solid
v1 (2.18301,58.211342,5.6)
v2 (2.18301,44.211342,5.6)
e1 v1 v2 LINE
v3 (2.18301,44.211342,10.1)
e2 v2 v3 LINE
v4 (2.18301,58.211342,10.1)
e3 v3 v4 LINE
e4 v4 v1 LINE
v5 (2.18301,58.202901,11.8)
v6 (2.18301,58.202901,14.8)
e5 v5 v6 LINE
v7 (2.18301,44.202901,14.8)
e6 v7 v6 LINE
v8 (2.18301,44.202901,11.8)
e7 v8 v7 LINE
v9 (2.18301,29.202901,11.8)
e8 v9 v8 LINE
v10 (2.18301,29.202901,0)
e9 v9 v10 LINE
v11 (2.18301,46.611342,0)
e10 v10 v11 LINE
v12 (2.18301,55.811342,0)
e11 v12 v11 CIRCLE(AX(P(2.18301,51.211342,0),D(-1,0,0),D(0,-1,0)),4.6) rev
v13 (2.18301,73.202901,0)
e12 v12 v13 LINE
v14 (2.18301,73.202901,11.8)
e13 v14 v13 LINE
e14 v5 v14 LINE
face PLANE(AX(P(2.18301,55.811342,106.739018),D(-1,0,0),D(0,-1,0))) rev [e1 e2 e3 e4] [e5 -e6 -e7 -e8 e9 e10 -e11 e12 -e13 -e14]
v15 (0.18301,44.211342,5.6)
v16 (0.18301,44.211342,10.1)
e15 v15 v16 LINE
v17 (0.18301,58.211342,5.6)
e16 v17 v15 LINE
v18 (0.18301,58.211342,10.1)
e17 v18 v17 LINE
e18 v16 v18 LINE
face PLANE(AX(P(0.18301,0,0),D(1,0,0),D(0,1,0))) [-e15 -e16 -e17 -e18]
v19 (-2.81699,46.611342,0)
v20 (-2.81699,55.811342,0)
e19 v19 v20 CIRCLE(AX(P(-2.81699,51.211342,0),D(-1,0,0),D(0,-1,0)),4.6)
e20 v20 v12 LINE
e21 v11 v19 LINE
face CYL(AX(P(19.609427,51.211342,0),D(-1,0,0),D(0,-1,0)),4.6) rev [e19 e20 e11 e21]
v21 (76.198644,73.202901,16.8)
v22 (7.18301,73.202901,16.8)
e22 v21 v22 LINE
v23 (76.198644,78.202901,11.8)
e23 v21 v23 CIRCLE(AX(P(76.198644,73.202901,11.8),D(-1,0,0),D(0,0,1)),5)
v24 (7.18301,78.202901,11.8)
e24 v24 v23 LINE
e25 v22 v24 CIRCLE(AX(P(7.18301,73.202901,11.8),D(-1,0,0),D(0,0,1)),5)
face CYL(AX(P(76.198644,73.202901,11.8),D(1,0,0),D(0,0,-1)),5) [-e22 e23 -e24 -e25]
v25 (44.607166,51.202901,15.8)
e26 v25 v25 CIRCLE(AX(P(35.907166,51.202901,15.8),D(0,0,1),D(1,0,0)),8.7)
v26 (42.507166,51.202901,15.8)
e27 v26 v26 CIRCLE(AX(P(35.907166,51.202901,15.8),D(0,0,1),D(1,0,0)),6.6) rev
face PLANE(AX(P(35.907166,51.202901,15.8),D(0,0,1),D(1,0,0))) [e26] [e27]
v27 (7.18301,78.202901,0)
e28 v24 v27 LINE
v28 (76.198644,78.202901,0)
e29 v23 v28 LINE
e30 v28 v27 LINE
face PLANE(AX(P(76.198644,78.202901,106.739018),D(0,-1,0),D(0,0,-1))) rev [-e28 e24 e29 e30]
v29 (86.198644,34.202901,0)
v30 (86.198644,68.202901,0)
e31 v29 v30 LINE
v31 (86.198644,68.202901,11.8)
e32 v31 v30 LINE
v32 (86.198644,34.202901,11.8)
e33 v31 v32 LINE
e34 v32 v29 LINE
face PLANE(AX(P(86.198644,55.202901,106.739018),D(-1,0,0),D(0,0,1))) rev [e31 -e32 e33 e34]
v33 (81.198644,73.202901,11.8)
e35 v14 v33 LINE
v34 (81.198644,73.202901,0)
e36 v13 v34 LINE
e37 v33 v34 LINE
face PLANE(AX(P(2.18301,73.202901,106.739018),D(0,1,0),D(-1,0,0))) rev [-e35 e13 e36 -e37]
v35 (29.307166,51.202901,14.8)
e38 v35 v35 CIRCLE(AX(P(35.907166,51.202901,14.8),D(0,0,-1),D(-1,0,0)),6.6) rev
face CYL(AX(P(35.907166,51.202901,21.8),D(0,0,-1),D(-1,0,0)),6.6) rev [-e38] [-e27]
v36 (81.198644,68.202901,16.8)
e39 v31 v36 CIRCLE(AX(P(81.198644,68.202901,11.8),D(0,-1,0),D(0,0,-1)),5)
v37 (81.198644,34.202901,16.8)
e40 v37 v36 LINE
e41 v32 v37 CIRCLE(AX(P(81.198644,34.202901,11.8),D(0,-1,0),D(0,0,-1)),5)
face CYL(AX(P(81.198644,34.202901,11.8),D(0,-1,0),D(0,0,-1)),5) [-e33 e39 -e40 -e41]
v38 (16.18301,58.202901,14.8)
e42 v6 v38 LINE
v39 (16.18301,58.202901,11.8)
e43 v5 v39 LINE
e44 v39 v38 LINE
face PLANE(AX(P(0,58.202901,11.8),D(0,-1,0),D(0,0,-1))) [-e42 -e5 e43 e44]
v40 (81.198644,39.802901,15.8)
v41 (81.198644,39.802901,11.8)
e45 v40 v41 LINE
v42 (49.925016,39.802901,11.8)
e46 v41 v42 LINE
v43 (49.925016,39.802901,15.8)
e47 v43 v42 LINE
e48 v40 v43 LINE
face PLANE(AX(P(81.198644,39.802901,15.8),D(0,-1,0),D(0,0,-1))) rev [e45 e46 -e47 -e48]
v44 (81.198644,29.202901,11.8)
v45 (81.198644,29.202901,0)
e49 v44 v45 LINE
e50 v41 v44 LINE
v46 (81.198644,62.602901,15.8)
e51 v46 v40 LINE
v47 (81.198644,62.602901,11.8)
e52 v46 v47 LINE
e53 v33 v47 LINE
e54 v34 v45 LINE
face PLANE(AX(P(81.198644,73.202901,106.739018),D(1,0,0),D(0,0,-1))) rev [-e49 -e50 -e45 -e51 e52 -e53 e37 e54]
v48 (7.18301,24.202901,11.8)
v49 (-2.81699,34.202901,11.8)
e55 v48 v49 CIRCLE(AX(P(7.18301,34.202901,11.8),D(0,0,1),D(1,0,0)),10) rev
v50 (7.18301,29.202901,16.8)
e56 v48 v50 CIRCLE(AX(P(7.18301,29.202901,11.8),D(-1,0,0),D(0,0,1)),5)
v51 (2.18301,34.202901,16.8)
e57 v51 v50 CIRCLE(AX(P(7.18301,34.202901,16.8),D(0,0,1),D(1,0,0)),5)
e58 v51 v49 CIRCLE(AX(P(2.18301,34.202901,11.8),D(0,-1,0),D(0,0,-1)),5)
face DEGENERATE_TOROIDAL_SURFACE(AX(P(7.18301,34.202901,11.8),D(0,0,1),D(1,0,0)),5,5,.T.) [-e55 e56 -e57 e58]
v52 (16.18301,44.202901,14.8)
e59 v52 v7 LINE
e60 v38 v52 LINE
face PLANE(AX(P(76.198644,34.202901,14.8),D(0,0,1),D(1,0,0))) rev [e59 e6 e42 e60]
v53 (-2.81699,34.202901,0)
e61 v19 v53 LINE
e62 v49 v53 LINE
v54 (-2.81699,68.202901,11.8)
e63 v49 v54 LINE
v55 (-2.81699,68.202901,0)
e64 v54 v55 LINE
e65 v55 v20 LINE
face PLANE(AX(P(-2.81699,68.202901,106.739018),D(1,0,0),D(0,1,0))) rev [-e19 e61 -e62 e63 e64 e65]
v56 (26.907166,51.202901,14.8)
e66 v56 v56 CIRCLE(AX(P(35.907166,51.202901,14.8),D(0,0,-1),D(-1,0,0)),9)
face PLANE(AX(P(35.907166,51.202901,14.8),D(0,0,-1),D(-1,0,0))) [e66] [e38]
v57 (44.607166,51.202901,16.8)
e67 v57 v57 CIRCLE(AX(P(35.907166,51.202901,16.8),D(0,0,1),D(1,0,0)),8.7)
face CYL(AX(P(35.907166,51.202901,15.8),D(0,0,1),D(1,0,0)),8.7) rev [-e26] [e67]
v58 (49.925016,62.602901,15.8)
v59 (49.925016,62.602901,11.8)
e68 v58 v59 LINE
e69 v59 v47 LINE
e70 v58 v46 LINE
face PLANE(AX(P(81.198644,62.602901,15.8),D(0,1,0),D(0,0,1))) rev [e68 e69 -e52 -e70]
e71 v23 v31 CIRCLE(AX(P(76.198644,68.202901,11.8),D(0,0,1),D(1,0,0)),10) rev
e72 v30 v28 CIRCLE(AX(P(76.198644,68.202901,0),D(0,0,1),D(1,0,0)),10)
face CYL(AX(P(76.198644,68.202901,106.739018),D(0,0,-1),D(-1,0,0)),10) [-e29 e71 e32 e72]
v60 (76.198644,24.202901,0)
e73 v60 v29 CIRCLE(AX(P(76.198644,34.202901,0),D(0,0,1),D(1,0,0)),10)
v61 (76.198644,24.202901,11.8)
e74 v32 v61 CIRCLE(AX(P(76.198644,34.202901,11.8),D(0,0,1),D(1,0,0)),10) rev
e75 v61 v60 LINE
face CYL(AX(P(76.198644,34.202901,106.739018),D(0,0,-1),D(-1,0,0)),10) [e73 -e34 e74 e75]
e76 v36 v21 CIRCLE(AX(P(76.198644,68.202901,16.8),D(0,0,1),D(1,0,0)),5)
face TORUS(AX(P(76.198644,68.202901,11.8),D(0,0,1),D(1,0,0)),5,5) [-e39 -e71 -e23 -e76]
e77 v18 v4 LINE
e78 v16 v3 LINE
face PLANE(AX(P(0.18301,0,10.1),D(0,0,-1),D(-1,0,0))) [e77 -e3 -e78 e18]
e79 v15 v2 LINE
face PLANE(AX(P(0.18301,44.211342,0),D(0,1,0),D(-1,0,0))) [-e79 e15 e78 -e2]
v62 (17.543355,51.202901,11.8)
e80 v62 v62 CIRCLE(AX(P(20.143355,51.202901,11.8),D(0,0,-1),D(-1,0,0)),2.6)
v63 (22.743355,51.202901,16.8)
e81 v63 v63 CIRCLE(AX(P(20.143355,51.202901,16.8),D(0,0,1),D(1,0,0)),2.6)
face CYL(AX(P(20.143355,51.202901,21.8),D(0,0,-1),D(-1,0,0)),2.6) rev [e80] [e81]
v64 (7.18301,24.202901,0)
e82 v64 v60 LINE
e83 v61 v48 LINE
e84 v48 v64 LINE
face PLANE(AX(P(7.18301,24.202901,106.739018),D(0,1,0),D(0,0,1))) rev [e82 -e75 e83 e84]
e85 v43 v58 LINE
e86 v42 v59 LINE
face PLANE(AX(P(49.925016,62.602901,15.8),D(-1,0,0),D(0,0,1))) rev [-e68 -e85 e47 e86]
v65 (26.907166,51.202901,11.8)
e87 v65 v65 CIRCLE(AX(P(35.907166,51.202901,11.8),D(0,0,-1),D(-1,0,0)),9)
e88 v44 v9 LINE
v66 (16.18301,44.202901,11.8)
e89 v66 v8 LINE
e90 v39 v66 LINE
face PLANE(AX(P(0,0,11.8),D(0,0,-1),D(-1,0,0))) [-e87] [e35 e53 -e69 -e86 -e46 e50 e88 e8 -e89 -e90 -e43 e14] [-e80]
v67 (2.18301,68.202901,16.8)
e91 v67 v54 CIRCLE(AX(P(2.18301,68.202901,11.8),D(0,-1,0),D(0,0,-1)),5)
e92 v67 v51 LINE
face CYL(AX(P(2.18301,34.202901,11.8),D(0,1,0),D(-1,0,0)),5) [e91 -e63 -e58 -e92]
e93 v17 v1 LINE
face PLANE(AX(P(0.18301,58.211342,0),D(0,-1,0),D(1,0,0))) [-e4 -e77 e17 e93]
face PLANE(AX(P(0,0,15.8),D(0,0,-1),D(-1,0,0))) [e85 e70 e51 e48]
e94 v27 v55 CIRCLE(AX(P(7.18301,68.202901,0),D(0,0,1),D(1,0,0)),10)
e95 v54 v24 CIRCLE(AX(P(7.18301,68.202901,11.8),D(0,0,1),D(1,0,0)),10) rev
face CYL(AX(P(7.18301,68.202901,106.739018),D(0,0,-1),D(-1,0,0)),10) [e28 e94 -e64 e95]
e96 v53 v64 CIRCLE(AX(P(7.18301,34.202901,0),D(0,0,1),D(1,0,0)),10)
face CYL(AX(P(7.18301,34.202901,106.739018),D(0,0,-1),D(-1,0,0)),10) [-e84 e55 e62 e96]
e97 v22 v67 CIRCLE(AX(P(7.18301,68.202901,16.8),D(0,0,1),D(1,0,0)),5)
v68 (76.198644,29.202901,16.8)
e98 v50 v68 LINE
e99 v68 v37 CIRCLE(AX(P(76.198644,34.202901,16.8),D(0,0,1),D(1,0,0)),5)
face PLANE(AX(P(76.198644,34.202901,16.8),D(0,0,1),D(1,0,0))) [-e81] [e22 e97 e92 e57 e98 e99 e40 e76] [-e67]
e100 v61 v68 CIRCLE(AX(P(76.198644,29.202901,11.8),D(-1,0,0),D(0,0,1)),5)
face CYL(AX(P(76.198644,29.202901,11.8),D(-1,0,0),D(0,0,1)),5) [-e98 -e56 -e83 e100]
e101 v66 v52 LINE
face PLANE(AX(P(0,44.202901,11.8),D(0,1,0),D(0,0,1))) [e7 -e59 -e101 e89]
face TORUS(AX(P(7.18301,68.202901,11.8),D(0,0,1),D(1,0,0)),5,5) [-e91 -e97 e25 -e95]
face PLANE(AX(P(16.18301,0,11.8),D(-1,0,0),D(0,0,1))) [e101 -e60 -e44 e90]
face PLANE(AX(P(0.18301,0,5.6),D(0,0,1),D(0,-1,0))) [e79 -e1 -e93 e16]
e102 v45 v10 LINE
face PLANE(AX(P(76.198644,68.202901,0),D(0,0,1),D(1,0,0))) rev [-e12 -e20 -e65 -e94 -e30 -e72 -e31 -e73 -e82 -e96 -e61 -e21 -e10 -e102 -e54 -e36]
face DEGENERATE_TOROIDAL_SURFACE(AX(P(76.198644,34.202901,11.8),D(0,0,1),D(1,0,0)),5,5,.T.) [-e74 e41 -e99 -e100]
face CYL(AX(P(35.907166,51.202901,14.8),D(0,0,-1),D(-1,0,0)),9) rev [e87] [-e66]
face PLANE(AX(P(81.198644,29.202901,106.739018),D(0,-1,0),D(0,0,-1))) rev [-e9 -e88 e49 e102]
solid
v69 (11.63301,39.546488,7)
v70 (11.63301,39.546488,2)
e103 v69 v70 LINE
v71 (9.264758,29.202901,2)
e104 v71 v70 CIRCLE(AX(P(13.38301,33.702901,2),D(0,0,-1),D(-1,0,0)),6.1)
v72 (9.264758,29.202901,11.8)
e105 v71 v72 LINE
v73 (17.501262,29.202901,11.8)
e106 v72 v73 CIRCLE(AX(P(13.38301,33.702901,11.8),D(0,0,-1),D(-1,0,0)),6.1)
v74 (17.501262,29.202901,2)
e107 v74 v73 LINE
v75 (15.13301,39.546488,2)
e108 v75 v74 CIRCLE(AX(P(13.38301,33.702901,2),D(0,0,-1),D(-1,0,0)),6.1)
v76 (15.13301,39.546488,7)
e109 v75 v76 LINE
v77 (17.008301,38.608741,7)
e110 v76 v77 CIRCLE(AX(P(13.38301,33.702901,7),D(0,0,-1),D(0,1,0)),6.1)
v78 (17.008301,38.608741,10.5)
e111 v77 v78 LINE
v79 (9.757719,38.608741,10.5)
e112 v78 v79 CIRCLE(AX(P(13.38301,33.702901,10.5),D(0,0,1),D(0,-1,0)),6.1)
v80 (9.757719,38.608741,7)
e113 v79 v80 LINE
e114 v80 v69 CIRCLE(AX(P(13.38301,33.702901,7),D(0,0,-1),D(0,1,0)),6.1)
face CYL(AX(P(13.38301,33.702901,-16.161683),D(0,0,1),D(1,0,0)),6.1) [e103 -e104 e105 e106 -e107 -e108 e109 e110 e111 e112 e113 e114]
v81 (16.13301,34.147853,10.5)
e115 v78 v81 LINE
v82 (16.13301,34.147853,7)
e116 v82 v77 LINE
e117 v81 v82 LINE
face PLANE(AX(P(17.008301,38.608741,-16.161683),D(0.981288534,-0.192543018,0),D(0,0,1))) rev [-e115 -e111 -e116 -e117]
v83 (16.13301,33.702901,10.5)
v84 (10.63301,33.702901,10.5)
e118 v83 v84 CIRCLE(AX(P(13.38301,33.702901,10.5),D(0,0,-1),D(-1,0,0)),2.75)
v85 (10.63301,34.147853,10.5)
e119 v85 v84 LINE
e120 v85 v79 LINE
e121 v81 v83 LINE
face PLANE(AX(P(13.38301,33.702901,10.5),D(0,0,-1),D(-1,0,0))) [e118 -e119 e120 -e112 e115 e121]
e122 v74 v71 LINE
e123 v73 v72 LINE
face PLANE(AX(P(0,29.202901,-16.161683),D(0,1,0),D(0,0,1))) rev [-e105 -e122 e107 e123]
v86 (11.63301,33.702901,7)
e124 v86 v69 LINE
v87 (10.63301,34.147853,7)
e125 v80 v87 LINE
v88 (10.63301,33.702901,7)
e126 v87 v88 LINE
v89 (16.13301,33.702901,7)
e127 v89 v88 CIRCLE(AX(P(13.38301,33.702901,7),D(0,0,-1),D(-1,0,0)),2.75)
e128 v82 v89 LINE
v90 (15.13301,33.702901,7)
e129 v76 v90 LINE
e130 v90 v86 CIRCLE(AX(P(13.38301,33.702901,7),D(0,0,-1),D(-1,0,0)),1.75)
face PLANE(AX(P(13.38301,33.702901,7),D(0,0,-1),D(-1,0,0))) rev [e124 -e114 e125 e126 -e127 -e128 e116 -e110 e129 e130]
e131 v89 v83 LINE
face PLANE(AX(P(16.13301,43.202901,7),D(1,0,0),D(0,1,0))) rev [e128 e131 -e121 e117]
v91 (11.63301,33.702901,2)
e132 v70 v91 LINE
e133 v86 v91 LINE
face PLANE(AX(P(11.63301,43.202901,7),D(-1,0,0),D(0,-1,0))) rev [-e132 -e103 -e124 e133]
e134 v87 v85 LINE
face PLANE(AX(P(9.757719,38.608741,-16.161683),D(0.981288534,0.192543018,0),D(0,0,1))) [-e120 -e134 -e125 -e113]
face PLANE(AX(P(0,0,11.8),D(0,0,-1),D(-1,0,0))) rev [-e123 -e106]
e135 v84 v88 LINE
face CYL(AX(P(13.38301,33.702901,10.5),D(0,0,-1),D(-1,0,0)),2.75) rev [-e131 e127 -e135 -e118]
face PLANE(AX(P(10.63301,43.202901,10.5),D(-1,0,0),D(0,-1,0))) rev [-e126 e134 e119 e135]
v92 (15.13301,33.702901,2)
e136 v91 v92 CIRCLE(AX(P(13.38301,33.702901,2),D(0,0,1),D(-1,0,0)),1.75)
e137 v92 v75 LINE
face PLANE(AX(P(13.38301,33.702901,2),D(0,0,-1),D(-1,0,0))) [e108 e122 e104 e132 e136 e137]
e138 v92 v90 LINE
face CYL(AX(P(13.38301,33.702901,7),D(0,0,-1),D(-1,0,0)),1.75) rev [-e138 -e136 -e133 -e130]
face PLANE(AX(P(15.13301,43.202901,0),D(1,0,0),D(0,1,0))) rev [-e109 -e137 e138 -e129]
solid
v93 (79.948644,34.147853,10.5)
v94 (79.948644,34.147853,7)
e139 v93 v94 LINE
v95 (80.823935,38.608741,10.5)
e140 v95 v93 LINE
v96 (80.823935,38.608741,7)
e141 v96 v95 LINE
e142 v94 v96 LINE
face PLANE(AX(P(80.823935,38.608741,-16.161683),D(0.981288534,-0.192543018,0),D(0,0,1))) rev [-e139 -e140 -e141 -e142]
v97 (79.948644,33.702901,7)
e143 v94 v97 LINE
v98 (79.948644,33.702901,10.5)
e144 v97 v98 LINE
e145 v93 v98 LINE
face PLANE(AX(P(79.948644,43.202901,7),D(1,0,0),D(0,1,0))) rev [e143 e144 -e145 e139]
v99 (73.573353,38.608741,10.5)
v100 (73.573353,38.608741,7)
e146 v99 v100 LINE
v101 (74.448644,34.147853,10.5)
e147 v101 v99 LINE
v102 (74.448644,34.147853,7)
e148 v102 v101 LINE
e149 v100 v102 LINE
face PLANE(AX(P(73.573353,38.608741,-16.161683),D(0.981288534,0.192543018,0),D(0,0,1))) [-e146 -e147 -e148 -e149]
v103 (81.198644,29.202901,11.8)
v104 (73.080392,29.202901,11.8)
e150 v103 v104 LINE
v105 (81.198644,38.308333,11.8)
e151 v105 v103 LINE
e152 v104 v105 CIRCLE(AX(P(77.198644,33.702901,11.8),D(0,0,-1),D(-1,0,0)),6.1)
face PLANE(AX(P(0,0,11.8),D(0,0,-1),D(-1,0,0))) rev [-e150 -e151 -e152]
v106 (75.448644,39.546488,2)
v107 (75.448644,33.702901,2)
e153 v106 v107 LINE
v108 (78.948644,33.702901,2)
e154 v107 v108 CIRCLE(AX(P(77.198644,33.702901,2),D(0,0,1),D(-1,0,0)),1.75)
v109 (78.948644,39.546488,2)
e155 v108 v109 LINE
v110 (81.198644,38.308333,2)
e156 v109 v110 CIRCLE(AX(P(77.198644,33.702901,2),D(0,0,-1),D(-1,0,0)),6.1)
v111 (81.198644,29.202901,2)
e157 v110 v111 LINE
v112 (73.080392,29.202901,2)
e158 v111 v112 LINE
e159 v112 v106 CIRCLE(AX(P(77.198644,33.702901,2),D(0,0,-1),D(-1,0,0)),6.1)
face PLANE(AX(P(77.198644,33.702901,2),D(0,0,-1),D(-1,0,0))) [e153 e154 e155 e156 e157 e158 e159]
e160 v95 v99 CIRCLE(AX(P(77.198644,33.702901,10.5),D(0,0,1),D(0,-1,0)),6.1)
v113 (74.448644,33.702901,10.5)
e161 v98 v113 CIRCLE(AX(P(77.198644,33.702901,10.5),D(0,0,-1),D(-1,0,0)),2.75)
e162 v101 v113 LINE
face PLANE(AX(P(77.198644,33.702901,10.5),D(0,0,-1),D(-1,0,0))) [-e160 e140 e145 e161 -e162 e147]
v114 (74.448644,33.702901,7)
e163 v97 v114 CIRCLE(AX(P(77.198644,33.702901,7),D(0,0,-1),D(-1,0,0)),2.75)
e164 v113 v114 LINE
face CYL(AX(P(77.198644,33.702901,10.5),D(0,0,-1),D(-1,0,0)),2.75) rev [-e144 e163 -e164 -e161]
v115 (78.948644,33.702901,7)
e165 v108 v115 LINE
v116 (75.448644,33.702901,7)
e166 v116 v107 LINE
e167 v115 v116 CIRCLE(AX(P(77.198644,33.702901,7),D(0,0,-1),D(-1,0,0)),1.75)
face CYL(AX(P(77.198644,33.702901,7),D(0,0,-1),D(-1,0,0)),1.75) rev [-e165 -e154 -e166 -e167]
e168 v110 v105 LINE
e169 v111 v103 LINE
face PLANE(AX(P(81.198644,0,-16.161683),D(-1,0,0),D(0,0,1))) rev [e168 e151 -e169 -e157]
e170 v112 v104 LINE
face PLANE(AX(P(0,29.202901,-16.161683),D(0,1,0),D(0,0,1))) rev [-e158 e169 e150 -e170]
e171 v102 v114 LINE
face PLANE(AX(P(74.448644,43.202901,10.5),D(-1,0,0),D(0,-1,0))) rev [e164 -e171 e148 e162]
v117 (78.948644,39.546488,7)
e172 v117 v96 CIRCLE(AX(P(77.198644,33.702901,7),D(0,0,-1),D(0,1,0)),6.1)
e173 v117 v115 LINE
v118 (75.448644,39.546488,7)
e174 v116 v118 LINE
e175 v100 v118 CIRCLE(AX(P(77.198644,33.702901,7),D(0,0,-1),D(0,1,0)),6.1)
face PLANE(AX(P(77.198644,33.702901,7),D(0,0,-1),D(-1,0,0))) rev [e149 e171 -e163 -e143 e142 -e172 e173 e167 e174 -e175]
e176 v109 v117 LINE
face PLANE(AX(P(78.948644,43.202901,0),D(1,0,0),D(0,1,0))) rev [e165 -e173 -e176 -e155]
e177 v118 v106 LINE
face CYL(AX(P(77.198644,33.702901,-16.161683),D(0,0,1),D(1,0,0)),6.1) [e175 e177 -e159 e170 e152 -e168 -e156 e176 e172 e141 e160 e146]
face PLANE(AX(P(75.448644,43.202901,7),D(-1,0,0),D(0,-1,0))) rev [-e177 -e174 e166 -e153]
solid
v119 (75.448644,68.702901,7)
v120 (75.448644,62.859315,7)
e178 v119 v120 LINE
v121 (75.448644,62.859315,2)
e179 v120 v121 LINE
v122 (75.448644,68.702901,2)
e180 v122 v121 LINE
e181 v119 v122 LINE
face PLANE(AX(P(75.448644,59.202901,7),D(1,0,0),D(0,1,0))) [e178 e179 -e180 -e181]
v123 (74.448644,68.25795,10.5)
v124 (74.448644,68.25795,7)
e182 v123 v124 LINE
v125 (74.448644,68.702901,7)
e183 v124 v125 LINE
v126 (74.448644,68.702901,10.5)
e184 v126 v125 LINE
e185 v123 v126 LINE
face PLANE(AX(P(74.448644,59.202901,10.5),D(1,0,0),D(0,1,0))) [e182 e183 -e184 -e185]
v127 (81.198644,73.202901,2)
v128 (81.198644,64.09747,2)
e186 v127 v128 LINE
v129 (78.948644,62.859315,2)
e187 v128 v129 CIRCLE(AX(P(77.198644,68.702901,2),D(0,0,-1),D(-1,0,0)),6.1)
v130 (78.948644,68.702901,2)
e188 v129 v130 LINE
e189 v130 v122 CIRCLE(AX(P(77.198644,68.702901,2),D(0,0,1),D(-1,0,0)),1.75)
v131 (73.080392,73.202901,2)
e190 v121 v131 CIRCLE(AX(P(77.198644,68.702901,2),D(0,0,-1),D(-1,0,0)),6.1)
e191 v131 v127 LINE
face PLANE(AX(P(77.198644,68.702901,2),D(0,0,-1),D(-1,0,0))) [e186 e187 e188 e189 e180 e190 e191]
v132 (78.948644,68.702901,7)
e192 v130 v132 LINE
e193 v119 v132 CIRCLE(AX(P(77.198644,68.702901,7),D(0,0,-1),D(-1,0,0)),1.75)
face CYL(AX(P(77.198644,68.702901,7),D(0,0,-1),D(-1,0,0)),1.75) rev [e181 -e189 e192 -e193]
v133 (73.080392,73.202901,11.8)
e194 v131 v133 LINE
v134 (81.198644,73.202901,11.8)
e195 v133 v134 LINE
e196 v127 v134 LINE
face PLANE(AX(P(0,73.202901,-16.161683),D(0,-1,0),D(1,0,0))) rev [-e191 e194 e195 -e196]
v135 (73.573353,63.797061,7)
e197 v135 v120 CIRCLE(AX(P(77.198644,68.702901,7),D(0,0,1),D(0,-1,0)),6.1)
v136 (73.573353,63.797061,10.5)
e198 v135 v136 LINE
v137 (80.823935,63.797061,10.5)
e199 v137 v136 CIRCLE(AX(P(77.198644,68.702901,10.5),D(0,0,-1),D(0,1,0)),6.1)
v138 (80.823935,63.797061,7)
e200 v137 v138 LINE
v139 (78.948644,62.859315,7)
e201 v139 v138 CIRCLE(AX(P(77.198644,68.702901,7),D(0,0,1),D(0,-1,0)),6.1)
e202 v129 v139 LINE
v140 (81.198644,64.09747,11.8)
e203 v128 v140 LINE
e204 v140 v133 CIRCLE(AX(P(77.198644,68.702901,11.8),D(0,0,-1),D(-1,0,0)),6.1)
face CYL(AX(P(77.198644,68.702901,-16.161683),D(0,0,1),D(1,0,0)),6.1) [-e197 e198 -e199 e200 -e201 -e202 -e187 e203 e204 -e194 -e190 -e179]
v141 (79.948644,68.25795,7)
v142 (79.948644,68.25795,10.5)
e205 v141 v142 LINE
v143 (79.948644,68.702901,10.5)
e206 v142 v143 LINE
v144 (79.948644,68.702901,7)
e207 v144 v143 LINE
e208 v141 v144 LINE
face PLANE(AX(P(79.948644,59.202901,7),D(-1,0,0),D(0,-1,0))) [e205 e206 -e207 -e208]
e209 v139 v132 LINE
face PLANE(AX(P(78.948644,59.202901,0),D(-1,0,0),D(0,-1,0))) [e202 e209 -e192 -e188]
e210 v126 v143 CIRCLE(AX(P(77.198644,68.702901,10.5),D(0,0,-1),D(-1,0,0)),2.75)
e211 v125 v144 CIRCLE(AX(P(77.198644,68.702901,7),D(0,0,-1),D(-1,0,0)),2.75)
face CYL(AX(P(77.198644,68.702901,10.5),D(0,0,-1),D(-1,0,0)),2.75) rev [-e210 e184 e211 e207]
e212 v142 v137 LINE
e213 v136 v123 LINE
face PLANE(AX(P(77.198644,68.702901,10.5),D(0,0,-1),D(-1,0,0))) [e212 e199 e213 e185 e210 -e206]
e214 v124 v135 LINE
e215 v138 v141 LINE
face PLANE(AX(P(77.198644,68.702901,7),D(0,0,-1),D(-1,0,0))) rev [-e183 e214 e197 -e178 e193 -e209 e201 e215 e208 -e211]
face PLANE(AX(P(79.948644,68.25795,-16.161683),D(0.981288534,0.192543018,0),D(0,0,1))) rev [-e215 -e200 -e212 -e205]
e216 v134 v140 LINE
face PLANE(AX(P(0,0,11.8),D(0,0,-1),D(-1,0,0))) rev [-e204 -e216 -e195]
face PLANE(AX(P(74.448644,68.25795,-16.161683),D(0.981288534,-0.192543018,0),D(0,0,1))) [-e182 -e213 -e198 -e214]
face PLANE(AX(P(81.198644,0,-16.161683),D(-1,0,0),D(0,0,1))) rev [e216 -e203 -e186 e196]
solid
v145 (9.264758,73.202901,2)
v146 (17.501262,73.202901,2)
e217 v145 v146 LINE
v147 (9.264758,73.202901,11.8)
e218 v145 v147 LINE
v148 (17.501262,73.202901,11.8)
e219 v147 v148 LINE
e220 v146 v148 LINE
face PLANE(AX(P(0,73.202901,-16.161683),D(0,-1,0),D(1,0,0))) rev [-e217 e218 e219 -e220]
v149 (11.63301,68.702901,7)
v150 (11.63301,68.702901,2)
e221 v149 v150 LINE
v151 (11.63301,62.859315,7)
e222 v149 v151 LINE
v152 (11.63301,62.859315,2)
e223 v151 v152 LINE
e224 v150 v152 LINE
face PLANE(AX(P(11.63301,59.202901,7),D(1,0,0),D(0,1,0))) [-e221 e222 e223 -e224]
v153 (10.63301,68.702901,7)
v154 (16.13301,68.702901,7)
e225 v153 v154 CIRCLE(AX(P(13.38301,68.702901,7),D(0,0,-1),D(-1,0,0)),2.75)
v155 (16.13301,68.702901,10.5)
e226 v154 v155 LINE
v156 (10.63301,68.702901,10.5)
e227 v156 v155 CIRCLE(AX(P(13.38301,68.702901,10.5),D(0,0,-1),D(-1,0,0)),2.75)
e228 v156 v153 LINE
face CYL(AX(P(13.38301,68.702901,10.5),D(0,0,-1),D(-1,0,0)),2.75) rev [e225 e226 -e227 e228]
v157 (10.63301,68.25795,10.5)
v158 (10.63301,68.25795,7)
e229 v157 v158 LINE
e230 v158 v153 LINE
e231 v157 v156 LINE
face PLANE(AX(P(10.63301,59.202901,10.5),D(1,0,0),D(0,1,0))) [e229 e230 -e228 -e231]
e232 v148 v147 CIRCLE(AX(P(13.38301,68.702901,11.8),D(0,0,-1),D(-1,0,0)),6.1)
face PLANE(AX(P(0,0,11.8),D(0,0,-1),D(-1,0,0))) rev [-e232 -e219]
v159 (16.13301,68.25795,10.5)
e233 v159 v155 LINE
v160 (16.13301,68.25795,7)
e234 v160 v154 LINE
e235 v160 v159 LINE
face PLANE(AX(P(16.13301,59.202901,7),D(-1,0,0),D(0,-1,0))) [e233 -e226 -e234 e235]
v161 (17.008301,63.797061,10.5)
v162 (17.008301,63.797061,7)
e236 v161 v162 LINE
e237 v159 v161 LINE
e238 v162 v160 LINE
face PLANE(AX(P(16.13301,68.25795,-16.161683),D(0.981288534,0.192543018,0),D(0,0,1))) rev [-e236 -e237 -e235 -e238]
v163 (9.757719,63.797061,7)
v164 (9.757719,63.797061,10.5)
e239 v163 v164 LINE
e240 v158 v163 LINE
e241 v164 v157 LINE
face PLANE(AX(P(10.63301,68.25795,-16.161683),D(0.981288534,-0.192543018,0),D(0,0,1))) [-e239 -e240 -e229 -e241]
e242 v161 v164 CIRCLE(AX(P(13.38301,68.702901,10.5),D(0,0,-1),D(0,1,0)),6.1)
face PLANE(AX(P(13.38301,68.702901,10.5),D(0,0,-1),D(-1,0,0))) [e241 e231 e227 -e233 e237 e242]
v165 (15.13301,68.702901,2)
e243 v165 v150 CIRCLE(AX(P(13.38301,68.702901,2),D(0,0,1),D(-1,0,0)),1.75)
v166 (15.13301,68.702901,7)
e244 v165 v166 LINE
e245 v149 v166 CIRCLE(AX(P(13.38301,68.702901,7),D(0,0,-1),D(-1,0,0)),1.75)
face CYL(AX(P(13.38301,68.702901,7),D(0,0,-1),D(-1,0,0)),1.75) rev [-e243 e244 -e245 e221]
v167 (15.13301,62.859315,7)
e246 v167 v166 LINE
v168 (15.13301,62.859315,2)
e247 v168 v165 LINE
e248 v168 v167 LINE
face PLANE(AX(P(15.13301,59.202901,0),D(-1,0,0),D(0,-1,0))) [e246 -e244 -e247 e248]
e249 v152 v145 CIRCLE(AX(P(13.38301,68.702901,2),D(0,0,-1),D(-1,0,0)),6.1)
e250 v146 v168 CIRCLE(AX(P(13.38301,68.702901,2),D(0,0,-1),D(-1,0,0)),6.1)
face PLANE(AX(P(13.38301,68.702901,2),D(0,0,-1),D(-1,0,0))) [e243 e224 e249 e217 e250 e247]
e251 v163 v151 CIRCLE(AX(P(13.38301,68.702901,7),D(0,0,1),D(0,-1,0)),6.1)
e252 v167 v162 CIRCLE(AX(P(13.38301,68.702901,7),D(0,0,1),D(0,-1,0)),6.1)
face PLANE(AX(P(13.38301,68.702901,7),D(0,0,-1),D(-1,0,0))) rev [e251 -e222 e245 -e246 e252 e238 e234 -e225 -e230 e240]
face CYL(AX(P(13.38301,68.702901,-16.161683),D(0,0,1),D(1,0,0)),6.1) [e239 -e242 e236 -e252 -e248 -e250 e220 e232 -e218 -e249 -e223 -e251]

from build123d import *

# Parameters (mm, degrees)
BOSS_EXTRUDE1_DEPTH   = 14.8
BOSS_EXTRUDE1_2_DEPTH = 14.8
BOSS_EXTRUDE2_DEPTH   = 5
SKETCH3_W             = 5
SKETCH3_H             = 14.8
BOSS_EXTRUDE3_DEPTH   = 12
BOSS_EXTRUDE4_DEPTH   = 2
BOSS_EXTRUDE5_DEPTH   = 3
CUT_EXTRUDE1_DEPTH    = 10
FILLET1_R             = 5
SKETCH8_R             = 1.75
BOSS_EXTRUDE6_DEPTH   = 11.8
SKETCH9_R             = 1.75
CUT_EXTRUDE2_DEPTH    = 7
SKETCH10_R            = 2.75
CUT_EXTRUDE3_DEPTH    = 3.5
CUT_EXTRUDE4_DEPTH    = 9.5
CUT_EXTRUDE5_DEPTH    = 9.5
CUT_EXTRUDE6_DEPTH    = 2
SKETCH14_R            = 9
CUT_EXTRUDE7_DEPTH    = 3
CUT_EXTRUDE8_DEPTH    = 2
CHAMFER1_SIZE         = 5
CHAMFER2_SIZE         = 5
CHAMFER3_SIZE         = 5
CHAMFER4_SIZE         = 5
SKETCH16_W            = 31.273628052
SKETCH16_H            = 22.8
CUT_EXTRUDE9_DEPTH    = 4
SKETCH17_R            = 8.7
CUT_EXTRUDE10_DEPTH   = 1


with BuildPart() as part:
    # Sketch1 → Boss-Extrude1 (new body)
    with BuildSketch(Plane.XY):
        with BuildLine():
            Line((76.198643796, 78.202901291), (7.183009885, 78.202901291))
            ThreePointArc((7.183009885, 78.202901291), (0.111942073, 75.273969103), (-2.816990115, 68.202901291))
            Line((-2.816990115, 68.202901291), (-2.816990115, 55.811342077))
            Line((-2.816990115, 55.811342077), (2.183009885, 55.811342077))
            Line((2.183009885, 55.811342077), (2.183009885, 73.202901291))
            Line((2.183009885, 73.202901291), (81.198643796, 73.202901291))
            Line((81.198643796, 73.202901291), (81.198643796, 55.202901291))
            Line((81.198643796, 55.202901291), (86.198643796, 55.202901291))
            Line((86.198643796, 55.202901291), (86.198643796, 68.202901291))
            ThreePointArc((86.198643796, 68.202901291), (83.269711608, 75.273969103), (76.198643796, 78.202901291))
        make_face()
    extrude(amount=BOSS_EXTRUDE1_DEPTH)



with BuildPart() as body_2:
    # Sketch1 → Boss-Extrude1 2 (new body)
    with BuildSketch(Plane.XY):
        with BuildLine():
            Line((7.183009885, 24.202901291), (76.198643796, 24.202901291))
            ThreePointArc((76.198643796, 24.202901291), (83.269711608, 27.131833479), (86.198643796, 34.202901291))
            Line((86.198643796, 34.202901291), (86.198643796, 47.202901291))
            Line((86.198643796, 47.202901291), (81.198643796, 47.202901291))
            Line((81.198643796, 47.202901291), (81.198643796, 29.202901291))
            Line((81.198643796, 29.202901291), (2.183009885, 29.202901291))
            Line((2.183009885, 29.202901291), (2.183009885, 46.611342077))
            Line((2.183009885, 46.611342077), (-2.816990115, 46.611342077))
            Line((-2.816990115, 46.611342077), (-2.816990115, 34.202901291))
            ThreePointArc((-2.816990115, 34.202901291), (0.111942073, 27.131833479), (7.183009885, 24.202901291))
        make_face()
    extrude(amount=BOSS_EXTRUDE1_2_DEPTH)


with BuildPart() as part_1:
    add(part.part)

    add(body_2.part)  # Boss-Extrude2 merges body 2
    # Sketch2 → Boss-Extrude2 (add)
    with BuildSketch(Plane.ZY.offset(2.816990115)):
        with BuildLine():
            ThreePointArc((0, 46.611342077), (4.6, 51.211342077), (0, 55.811342077))
            Line((0, 55.811342077), (14.8, 55.811342077))
            Line((14.8, 55.811342077), (14.8, 46.611342077))
            Line((14.8, 46.611342077), (0, 46.611342077))
        make_face()
    extrude(amount=-BOSS_EXTRUDE2_DEPTH)

    # Sketch3 → Boss-Extrude3 (add)
    with BuildSketch(Plane(origin=(0, 47.202901291, 0), x_dir=(1, 0, 0), z_dir=(0, 1, 0))):
        with Locations((83.698643796, -7.4)):
            Rectangle(SKETCH3_W, SKETCH3_H)
    extrude(amount=BOSS_EXTRUDE3_DEPTH)

    # Sketch4 → Boss-Extrude4 (add)
    with BuildSketch(Plane.XY.offset(14.8)):
        with BuildLine():
            Line((86.198643796, 34.202901291), (86.198643796, 68.202901291))
            ThreePointArc((86.198643796, 68.202901291), (83.269711608, 75.273969103), (76.198643796, 78.202901291))
            Line((76.198643796, 78.202901291), (7.183009885, 78.202901291))
            ThreePointArc((7.183009885, 78.202901291), (0.111942073, 75.273969103), (-2.816990115, 68.202901291))
            Line((-2.816990115, 68.202901291), (-2.816990115, 34.202901291))
            ThreePointArc((-2.816990115, 34.202901291), (0.111942073, 27.131833479), (7.183009885, 24.202901291))
            Line((7.183009885, 24.202901291), (76.198643796, 24.202901291))
            ThreePointArc((76.198643796, 24.202901291), (83.269711608, 27.131833479), (86.198643796, 34.202901291))
        make_face()
    extrude(amount=BOSS_EXTRUDE4_DEPTH)

    # Sketch6 → Boss-Extrude5 (add)
    with BuildSketch(Plane(origin=(0, 0, 14.8), x_dir=(-1, 0, 0), z_dir=(0, 0, -1))):
        Polygon((-16.183009885, 58.202901291), (-2.183009885, 58.202901291), (-2.183009885, 73.202901291), (-81.198643796, 73.202901291), (-81.198643796, 59.527901291), (-80.198643796, 59.527901291), (-79.792394453, 59.527901291), (-54.598643796, 59.527901291), (-54.598643796, 42.877901291), (-80.198643796, 42.877901291), (-81.198643796, 42.877901291), (-81.198643796, 29.202901291), (-2.183009885, 29.202901291), (-2.183009885, 44.202901291), (-16.183009885, 44.202901291), align=None)
    extrude(amount=BOSS_EXTRUDE5_DEPTH)

    # Sketch7 → Cut-Extrude1 (cut)
    with BuildSketch(Plane(origin=(0, 0, 11.8), x_dir=(-1, 0, 0), z_dir=(0, 0, -1))):
        with BuildLine():
            ThreePointArc((-42.507165967, 51.202901291), (-35.907165967, 44.602901291), (-29.307165967, 51.202901291))
            Line((-29.307165967, 51.202901291), (-42.507165967, 51.202901291))
        make_face()
        with BuildLine():
            Line((-42.507165967, 51.202901291), (-29.307165967, 51.202901291))
            ThreePointArc((-29.307165967, 51.202901291), (-35.907165967, 57.802901291), (-42.507165967, 51.202901291))
        make_face()
        with BuildLine():
            ThreePointArc((-22.743355222, 51.202901291), (-20.143355222, 48.602901291), (-17.543355222, 51.202901291))
            Line((-17.543355222, 51.202901291), (-22.743355222, 51.202901291))
        make_face()
        with BuildLine():
            Line((-22.743355222, 51.202901291), (-17.543355222, 51.202901291))
            ThreePointArc((-17.543355222, 51.202901291), (-20.143355222, 53.802901291), (-22.743355222, 51.202901291))
        make_face()
    extrude(amount=-CUT_EXTRUDE1_DEPTH, mode=Mode.SUBTRACT)

    # Fillet1
    fillet1_edges = [part_1.edges().sort_by_distance(p)[0] for p in [
        (83.269711608, 27.131833479, 16.8),
        (86.198643796, 51.202901291, 16.8),
        (83.269711608, 75.273969103, 16.8),
        (41.690826841, 78.202901291, 16.8),
        (0.111942073, 75.273969103, 16.8),
        (-2.816990115, 51.202901291, 16.8),
        (0.111942073, 27.131833479, 16.8),
        (41.690826841, 24.202901291, 16.8),
    ]]
    fillet(fillet1_edges, radius=FILLET1_R)

    # Sketch13 → Cut-Extrude6 (cut)
    with BuildSketch(Plane(origin=(2.183009885, 0, 0), x_dir=(0, 0, -1), z_dir=(1, 0, 0))):
        Polygon((-10.1, 58.211342077), (-5.6, 58.211342077), (-5.6, 51.211342077), (-5.6, 44.211342077), (-10.1, 44.211342077), align=None)
    extrude(amount=-CUT_EXTRUDE6_DEPTH, mode=Mode.SUBTRACT)

    # Sketch14 → Cut-Extrude7 (cut)
    with BuildSketch(Plane(origin=(0, 0, 11.8), x_dir=(-1, 0, 0), z_dir=(0, 0, -1))):
        with Locations((-35.907165967, 51.202901291)):
            Circle(SKETCH14_R)
    extrude(amount=-CUT_EXTRUDE7_DEPTH, mode=Mode.SUBTRACT)

    # Sketch16 → Cut-Extrude9 (cut)
    with BuildSketch(Plane(origin=(0, 0, 11.8), x_dir=(-1, 0, 0), z_dir=(0, 0, -1))):
        with Locations((-65.56182977, 51.202901291)):
            Rectangle(SKETCH16_W, SKETCH16_H)
    extrude(amount=-CUT_EXTRUDE9_DEPTH, mode=Mode.SUBTRACT)

    # Sketch17 → Cut-Extrude10 (cut)
    with BuildSketch(Plane.XY.offset(16.8)):
        with Locations((35.907165967, 51.202901291)):
            Circle(SKETCH17_R)
    extrude(amount=-CUT_EXTRUDE10_DEPTH, mode=Mode.SUBTRACT)


with BuildPart() as body_2_2:
    # Sketch8 → Boss-Extrude6 (new body)
    # profile 1 of 8: a face of its own
    with BuildSketch(Plane(origin=(0, 0, 11.8), x_dir=(-1, 0, 0), z_dir=(0, 0, -1))):
        with BuildLine():
            Line((-81.198643796, 29.202901291), (-73.08039174, 29.202901291))
            ThreePointArc((-73.08039174, 29.202901291), (-72.64554409, 37.762369614), (-81.198643796, 38.308332867))
            Line((-81.198643796, 38.308332867), (-81.198643796, 29.202901291))
        make_face()
        with Locations((-77.198643796, 33.702901291)):
            Circle(SKETCH8_R, mode=Mode.SUBTRACT)
    # profile 2 of 8: a face of its own
    with BuildSketch(Plane(origin=(0, 0, 11.8), x_dir=(-1, 0, 0), z_dir=(0, 0, -1))):
        with Locations((-77.198643796, 33.702901291)):
            Circle(SKETCH8_R)
    # profile 3 of 8: a face of its own
    with BuildSketch(Plane(origin=(0, 0, 11.8), x_dir=(-1, 0, 0), z_dir=(0, 0, -1))):
        with BuildLine():
            ThreePointArc((-81.198643796, 64.097469715), (-72.64554409, 64.643432968), (-73.08039174, 73.202901291))
            Line((-73.08039174, 73.202901291), (-81.198643796, 73.202901291))
            Line((-81.198643796, 73.202901291), (-81.198643796, 64.097469715))
        make_face()
        with Locations((-77.198643796, 68.702901291)):
            Circle(SKETCH8_R, mode=Mode.SUBTRACT)
    # profile 4 of 8: a face of its own
    with BuildSketch(Plane(origin=(0, 0, 11.8), x_dir=(-1, 0, 0), z_dir=(0, 0, -1))):
        with Locations((-77.198643796, 68.702901291)):
            Circle(SKETCH8_R)
    # profile 5 of 8: a face of its own
    with BuildSketch(Plane(origin=(0, 0, 11.8), x_dir=(-1, 0, 0), z_dir=(0, 0, -1))):
        with BuildLine():
            ThreePointArc((-17.501261942, 73.202901291), (-13.383009885, 62.602901291), (-9.264757829, 73.202901291))
            Line((-9.264757829, 73.202901291), (-17.501261942, 73.202901291))
        make_face()
        with Locations((-13.383009885, 68.702901291)):
            Circle(SKETCH8_R, mode=Mode.SUBTRACT)
    # profile 6 of 8: a face of its own
    with BuildSketch(Plane(origin=(0, 0, 11.8), x_dir=(-1, 0, 0), z_dir=(0, 0, -1))):
        with Locations((-13.383009885, 68.702901291)):
            Circle(SKETCH8_R)
    # profile 7 of 8: a face of its own
    with BuildSketch(Plane(origin=(0, 0, 11.8), x_dir=(-1, 0, 0), z_dir=(0, 0, -1))):
        with BuildLine():
            Line((-17.501261942, 29.202901291), (-9.264757829, 29.202901291))
            ThreePointArc((-9.264757829, 29.202901291), (-13.383009885, 39.802901291), (-17.501261942, 29.202901291))
        make_face()
        with Locations((-13.383009885, 33.702901291)):
            Circle(SKETCH8_R, mode=Mode.SUBTRACT)
    # profile 8 of 8: a face of its own
    with BuildSketch(Plane(origin=(0, 0, 11.8), x_dir=(-1, 0, 0), z_dir=(0, 0, -1))):
        with Locations((-13.383009885, 33.702901291)):
            Circle(SKETCH8_R)
    extrude(amount=BOSS_EXTRUDE6_DEPTH)

    # Sketch9 → Cut-Extrude2 (cut)
    with BuildSketch(Plane(origin=(0, 0, 0), x_dir=(-1, 0, 0), z_dir=(0, 0, -1))):
        with Locations((-77.198643796, 68.702901291)):
            Circle(SKETCH9_R)
        with Locations((-77.198643796, 33.702901291)):
            Circle(SKETCH9_R)
        with Locations((-13.383009885, 68.702901291)):
            Circle(SKETCH9_R)
        with Locations((-13.383009885, 33.702901291)):
            Circle(SKETCH9_R)
    extrude(amount=-CUT_EXTRUDE2_DEPTH, mode=Mode.SUBTRACT)

    # Sketch10 → Cut-Extrude3 (cut)
    with BuildSketch(Plane(origin=(0, 0, 7), x_dir=(-1, 0, 0), z_dir=(0, 0, -1))):
        with Locations((-77.198643796, 68.702901291)):
            Circle(SKETCH10_R)
        with Locations((-77.198643796, 33.702901291)):
            Circle(SKETCH10_R)
        with Locations((-13.383009885, 68.702901291)):
            Circle(SKETCH10_R)
        with Locations((-13.383009885, 33.702901291)):
            Circle(SKETCH10_R)
    extrude(amount=-CUT_EXTRUDE3_DEPTH, mode=Mode.SUBTRACT)

    # Sketch11 → Cut-Extrude4 (cut)
    with BuildSketch(Plane(origin=(0, 33.702901291, 0), x_dir=(-1, 0, 0), z_dir=(0, -1, 0))):
        Polygon((-78.948643796, 0), (-78.948643796, -7), (-79.948643796, -7), (-79.948643796, -10.5), (-74.448643796, -10.5), (-74.448643796, -7), (-75.448643796, -7), (-75.448643796, 0), align=None)
        Polygon((-15.133009885, 0), (-15.133009885, -7), (-16.133009885, -7), (-16.133009885, -10.5), (-10.633009885, -10.5), (-10.633009885, -7), (-11.633009885, -7), (-11.633009885, 0), align=None)
    extrude(amount=-CUT_EXTRUDE4_DEPTH, mode=Mode.SUBTRACT)

    # Sketch12 → Cut-Extrude5 (cut)
    with BuildSketch(Plane(origin=(0, 68.702901291, 0), x_dir=(-1, 0, 0), z_dir=(0, -1, 0))):
        Polygon((-78.948643796, 0), (-78.948643796, -7), (-79.948643796, -7), (-79.948643796, -10.5), (-74.448643796, -10.5), (-74.448643796, -7), (-75.448643796, -7), (-75.448643796, 0), align=None)
        Polygon((-15.133009885, 0), (-15.133009885, -7), (-16.133009885, -7), (-16.133009885, -10.5), (-10.633009885, -10.5), (-10.633009885, -7), (-11.633009885, -7), (-11.633009885, 0), align=None)
    extrude(amount=CUT_EXTRUDE5_DEPTH, mode=Mode.SUBTRACT)

    # Sketch15 → Cut-Extrude8 (cut)
    with BuildSketch(Plane(origin=(0, 0, 0), x_dir=(-1, 0, 0), z_dir=(0, 0, -1))):
        with BuildLine():
            Line((-15.133009885, 33.702901291), (-15.133009885, 39.546487518))
            ThreePointArc((-15.133009885, 39.546487518), (-19.329146409, 35.06431983), (-17.501261942, 29.202901291))
            Line((-17.501261942, 29.202901291), (-9.264757829, 29.202901291))
            ThreePointArc((-9.264757829, 29.202901291), (-7.436873361, 35.06431983), (-11.633009885, 39.546487518))
            Line((-11.633009885, 39.546487518), (-11.633009885, 33.702901291))
            ThreePointArc((-11.633009885, 33.702901291), (-13.383009885, 31.952901291), (-15.133009885, 33.702901291))
        make_face()
        with BuildLine():
            Line((-75.448643796, 68.702901291), (-75.448643796, 62.859315063))
            ThreePointArc((-75.448643796, 62.859315063), (-71.252507272, 67.341482752), (-73.08039174, 73.202901291))
            Line((-73.08039174, 73.202901291), (-81.198643796, 73.202901291))
            Line((-81.198643796, 73.202901291), (-81.198643796, 64.097469715))
            ThreePointArc((-81.198643796, 64.097469715), (-80.139541913, 63.35864098), (-78.948643796, 62.859315063))
            Line((-78.948643796, 62.859315063), (-78.948643796, 68.702901291))
            ThreePointArc((-78.948643796, 68.702901291), (-77.198643796, 70.452901291), (-75.448643796, 68.702901291))
        make_face()
        with BuildLine():
            Line((-78.948643796, 33.702901291), (-78.948643796, 39.546487518))
            ThreePointArc((-78.948643796, 39.546487518), (-80.139541913, 39.047161601), (-81.198643796, 38.308332867))
            Line((-81.198643796, 38.308332867), (-81.198643796, 29.202901291))
            Line((-81.198643796, 29.202901291), (-73.08039174, 29.202901291))
            ThreePointArc((-73.08039174, 29.202901291), (-71.252507272, 35.06431983), (-75.448643796, 39.546487518))
            Line((-75.448643796, 39.546487518), (-75.448643796, 33.702901291))
            ThreePointArc((-75.448643796, 33.702901291), (-77.198643796, 31.952901291), (-78.948643796, 33.702901291))
        make_face()
        with BuildLine():
            Line((-11.633009885, 68.702901291), (-11.633009885, 62.859315063))
            ThreePointArc((-11.633009885, 62.859315063), (-7.436873361, 67.341482752), (-9.264757829, 73.202901291))
            Line((-9.264757829, 73.202901291), (-17.501261942, 73.202901291))
            ThreePointArc((-17.501261942, 73.202901291), (-19.329146409, 67.341482752), (-15.133009885, 62.859315063))
            Line((-15.133009885, 62.859315063), (-15.133009885, 68.702901291))
            ThreePointArc((-15.133009885, 68.702901291), (-13.383009885, 70.452901291), (-11.633009885, 68.702901291))
        make_face()
    extrude(amount=-CUT_EXTRUDE8_DEPTH, mode=Mode.SUBTRACT)

    # Chamfer1
    # the kernel refuses this chamfer: 5, 1 mm, written as the material it takes off along each edge
    with BuildSketch(Plane(origin=(10.633009885, 39.147853081, 7), x_dir=(-0.8514536354192476, -0.524429887336093, 0), z_dir=(0, 0, 1))) as chamfer1_piece_1:
        with BuildLine():
            Line((1.027995913, 0), (CHAMFER1_SIZE * 0.524429887336, CHAMFER1_SIZE * 0.851453635419))
            Line((CHAMFER1_SIZE * 0.524429887336, CHAMFER1_SIZE * 0.851453635419), (0, 0))
            ThreePointArc((0, 0), (0.479339794, -0.021595354), (1.027995913, 0))
        make_face()
    extrude(amount=3.5, mode=Mode.SUBTRACT)
    with BuildSketch(Plane(origin=(16.133009885, 39.147853081, 7), x_dir=(0.851453635419248, -0.5244298873360922, 0), z_dir=(0, 0, 1))) as chamfer1_piece_2:
        with BuildLine():
            Line((1.027995913, 0), (CHAMFER1_SIZE * 0.524429887336, -CHAMFER1_SIZE * 0.851453635419))
            Line((CHAMFER1_SIZE * 0.524429887336, -CHAMFER1_SIZE * 0.851453635419), (0, 0))
            ThreePointArc((0, 0), (0.479339794, 0.021595354), (1.027995913, 0))
        make_face()
    extrude(amount=3.5, mode=Mode.SUBTRACT)

    # Chamfer2
    # the kernel refuses this chamfer: 5, 1 mm, written as the material it takes off along each edge
    with BuildSketch(Plane(origin=(74.448643796, 39.147853081, 7), x_dir=(-0.851453635419248, -0.5244298873360922, 0), z_dir=(0, 0, 1))) as chamfer2_piece_1:
        with BuildLine():
            Line((1.027995913, 0), (CHAMFER2_SIZE * 0.524429887336, CHAMFER2_SIZE * 0.851453635419))
            Line((CHAMFER2_SIZE * 0.524429887336, CHAMFER2_SIZE * 0.851453635419), (0, 0))
            ThreePointArc((0, 0), (0.479339794, -0.021595354), (1.027995913, 0))
        make_face()
    extrude(amount=3.5, mode=Mode.SUBTRACT)
    with BuildSketch(Plane(origin=(79.948643796, 39.147853081, 7), x_dir=(0.8514536354192449, -0.5244298873360972, 0), z_dir=(0, 0, 1))) as chamfer2_piece_2:
        with BuildLine():
            Line((1.027995913, 0), (CHAMFER2_SIZE * 0.524429887336, -CHAMFER2_SIZE * 0.851453635419))
            Line((CHAMFER2_SIZE * 0.524429887336, -CHAMFER2_SIZE * 0.851453635419), (0, 0))
            ThreePointArc((0, 0), (0.479339794, 0.021595354), (1.027995913, 0))
        make_face()
    extrude(amount=3.5, mode=Mode.SUBTRACT)

    # Chamfer3
    # the kernel refuses this chamfer: 5, 1 mm, written as the material it takes off along each edge
    with BuildSketch(Plane(origin=(79.948643796, 63.2579495, 7), x_dir=(0.851453635419248, 0.5244298873360922, 0), z_dir=(0, 0, 1))) as chamfer3_piece_1:
        with BuildLine():
            Line((1.027995913, 0), (CHAMFER3_SIZE * 0.524429887336, CHAMFER3_SIZE * 0.851453635419))
            Line((CHAMFER3_SIZE * 0.524429887336, CHAMFER3_SIZE * 0.851453635419), (0, 0))
            ThreePointArc((0, 0), (0.479339794, -0.021595354), (1.027995913, 0))
        make_face()
    extrude(amount=3.5, mode=Mode.SUBTRACT)
    with BuildSketch(Plane(origin=(74.448643796, 63.2579495, 7), x_dir=(-0.8514536354192449, 0.5244298873360972, 0), z_dir=(0, 0, 1))) as chamfer3_piece_2:
        with BuildLine():
            Line((1.027995913, 0), (CHAMFER3_SIZE * 0.524429887336, -CHAMFER3_SIZE * 0.851453635419))
            Line((CHAMFER3_SIZE * 0.524429887336, -CHAMFER3_SIZE * 0.851453635419), (0, 0))
            ThreePointArc((0, 0), (0.479339794, 0.021595354), (1.027995913, 0))
        make_face()
    extrude(amount=3.5, mode=Mode.SUBTRACT)

    # Chamfer4
    # the kernel refuses this chamfer: 5, 1 mm, written as the material it takes off along each edge
    with BuildSketch(Plane(origin=(16.133009885, 63.2579495, 7), x_dir=(0.851453635419248, 0.5244298873360922, 0), z_dir=(0, 0, 1))) as chamfer4_piece_1:
        with BuildLine():
            Line((1.027995913, 0), (CHAMFER4_SIZE * 0.524429887336, CHAMFER4_SIZE * 0.851453635419))
            Line((CHAMFER4_SIZE * 0.524429887336, CHAMFER4_SIZE * 0.851453635419), (0, 0))
            ThreePointArc((0, 0), (0.479339794, -0.021595354), (1.027995913, 0))
        make_face()
    extrude(amount=3.5, mode=Mode.SUBTRACT)
    with BuildSketch(Plane(origin=(10.633009885, 63.2579495, 7), x_dir=(-0.8514536354192476, 0.524429887336093, 0), z_dir=(0, 0, 1))) as chamfer4_piece_2:
        with BuildLine():
            Line((1.027995913, 0), (CHAMFER4_SIZE * 0.524429887336, -CHAMFER4_SIZE * 0.851453635419))
            Line((CHAMFER4_SIZE * 0.524429887336, -CHAMFER4_SIZE * 0.851453635419), (0, 0))
            ThreePointArc((0, 0), (0.479339794, 0.021595354), (1.027995913, 0))
        make_face()
    extrude(amount=3.5, mode=Mode.SUBTRACT)


solid = Compound([part_1.part, body_2_2.part])
